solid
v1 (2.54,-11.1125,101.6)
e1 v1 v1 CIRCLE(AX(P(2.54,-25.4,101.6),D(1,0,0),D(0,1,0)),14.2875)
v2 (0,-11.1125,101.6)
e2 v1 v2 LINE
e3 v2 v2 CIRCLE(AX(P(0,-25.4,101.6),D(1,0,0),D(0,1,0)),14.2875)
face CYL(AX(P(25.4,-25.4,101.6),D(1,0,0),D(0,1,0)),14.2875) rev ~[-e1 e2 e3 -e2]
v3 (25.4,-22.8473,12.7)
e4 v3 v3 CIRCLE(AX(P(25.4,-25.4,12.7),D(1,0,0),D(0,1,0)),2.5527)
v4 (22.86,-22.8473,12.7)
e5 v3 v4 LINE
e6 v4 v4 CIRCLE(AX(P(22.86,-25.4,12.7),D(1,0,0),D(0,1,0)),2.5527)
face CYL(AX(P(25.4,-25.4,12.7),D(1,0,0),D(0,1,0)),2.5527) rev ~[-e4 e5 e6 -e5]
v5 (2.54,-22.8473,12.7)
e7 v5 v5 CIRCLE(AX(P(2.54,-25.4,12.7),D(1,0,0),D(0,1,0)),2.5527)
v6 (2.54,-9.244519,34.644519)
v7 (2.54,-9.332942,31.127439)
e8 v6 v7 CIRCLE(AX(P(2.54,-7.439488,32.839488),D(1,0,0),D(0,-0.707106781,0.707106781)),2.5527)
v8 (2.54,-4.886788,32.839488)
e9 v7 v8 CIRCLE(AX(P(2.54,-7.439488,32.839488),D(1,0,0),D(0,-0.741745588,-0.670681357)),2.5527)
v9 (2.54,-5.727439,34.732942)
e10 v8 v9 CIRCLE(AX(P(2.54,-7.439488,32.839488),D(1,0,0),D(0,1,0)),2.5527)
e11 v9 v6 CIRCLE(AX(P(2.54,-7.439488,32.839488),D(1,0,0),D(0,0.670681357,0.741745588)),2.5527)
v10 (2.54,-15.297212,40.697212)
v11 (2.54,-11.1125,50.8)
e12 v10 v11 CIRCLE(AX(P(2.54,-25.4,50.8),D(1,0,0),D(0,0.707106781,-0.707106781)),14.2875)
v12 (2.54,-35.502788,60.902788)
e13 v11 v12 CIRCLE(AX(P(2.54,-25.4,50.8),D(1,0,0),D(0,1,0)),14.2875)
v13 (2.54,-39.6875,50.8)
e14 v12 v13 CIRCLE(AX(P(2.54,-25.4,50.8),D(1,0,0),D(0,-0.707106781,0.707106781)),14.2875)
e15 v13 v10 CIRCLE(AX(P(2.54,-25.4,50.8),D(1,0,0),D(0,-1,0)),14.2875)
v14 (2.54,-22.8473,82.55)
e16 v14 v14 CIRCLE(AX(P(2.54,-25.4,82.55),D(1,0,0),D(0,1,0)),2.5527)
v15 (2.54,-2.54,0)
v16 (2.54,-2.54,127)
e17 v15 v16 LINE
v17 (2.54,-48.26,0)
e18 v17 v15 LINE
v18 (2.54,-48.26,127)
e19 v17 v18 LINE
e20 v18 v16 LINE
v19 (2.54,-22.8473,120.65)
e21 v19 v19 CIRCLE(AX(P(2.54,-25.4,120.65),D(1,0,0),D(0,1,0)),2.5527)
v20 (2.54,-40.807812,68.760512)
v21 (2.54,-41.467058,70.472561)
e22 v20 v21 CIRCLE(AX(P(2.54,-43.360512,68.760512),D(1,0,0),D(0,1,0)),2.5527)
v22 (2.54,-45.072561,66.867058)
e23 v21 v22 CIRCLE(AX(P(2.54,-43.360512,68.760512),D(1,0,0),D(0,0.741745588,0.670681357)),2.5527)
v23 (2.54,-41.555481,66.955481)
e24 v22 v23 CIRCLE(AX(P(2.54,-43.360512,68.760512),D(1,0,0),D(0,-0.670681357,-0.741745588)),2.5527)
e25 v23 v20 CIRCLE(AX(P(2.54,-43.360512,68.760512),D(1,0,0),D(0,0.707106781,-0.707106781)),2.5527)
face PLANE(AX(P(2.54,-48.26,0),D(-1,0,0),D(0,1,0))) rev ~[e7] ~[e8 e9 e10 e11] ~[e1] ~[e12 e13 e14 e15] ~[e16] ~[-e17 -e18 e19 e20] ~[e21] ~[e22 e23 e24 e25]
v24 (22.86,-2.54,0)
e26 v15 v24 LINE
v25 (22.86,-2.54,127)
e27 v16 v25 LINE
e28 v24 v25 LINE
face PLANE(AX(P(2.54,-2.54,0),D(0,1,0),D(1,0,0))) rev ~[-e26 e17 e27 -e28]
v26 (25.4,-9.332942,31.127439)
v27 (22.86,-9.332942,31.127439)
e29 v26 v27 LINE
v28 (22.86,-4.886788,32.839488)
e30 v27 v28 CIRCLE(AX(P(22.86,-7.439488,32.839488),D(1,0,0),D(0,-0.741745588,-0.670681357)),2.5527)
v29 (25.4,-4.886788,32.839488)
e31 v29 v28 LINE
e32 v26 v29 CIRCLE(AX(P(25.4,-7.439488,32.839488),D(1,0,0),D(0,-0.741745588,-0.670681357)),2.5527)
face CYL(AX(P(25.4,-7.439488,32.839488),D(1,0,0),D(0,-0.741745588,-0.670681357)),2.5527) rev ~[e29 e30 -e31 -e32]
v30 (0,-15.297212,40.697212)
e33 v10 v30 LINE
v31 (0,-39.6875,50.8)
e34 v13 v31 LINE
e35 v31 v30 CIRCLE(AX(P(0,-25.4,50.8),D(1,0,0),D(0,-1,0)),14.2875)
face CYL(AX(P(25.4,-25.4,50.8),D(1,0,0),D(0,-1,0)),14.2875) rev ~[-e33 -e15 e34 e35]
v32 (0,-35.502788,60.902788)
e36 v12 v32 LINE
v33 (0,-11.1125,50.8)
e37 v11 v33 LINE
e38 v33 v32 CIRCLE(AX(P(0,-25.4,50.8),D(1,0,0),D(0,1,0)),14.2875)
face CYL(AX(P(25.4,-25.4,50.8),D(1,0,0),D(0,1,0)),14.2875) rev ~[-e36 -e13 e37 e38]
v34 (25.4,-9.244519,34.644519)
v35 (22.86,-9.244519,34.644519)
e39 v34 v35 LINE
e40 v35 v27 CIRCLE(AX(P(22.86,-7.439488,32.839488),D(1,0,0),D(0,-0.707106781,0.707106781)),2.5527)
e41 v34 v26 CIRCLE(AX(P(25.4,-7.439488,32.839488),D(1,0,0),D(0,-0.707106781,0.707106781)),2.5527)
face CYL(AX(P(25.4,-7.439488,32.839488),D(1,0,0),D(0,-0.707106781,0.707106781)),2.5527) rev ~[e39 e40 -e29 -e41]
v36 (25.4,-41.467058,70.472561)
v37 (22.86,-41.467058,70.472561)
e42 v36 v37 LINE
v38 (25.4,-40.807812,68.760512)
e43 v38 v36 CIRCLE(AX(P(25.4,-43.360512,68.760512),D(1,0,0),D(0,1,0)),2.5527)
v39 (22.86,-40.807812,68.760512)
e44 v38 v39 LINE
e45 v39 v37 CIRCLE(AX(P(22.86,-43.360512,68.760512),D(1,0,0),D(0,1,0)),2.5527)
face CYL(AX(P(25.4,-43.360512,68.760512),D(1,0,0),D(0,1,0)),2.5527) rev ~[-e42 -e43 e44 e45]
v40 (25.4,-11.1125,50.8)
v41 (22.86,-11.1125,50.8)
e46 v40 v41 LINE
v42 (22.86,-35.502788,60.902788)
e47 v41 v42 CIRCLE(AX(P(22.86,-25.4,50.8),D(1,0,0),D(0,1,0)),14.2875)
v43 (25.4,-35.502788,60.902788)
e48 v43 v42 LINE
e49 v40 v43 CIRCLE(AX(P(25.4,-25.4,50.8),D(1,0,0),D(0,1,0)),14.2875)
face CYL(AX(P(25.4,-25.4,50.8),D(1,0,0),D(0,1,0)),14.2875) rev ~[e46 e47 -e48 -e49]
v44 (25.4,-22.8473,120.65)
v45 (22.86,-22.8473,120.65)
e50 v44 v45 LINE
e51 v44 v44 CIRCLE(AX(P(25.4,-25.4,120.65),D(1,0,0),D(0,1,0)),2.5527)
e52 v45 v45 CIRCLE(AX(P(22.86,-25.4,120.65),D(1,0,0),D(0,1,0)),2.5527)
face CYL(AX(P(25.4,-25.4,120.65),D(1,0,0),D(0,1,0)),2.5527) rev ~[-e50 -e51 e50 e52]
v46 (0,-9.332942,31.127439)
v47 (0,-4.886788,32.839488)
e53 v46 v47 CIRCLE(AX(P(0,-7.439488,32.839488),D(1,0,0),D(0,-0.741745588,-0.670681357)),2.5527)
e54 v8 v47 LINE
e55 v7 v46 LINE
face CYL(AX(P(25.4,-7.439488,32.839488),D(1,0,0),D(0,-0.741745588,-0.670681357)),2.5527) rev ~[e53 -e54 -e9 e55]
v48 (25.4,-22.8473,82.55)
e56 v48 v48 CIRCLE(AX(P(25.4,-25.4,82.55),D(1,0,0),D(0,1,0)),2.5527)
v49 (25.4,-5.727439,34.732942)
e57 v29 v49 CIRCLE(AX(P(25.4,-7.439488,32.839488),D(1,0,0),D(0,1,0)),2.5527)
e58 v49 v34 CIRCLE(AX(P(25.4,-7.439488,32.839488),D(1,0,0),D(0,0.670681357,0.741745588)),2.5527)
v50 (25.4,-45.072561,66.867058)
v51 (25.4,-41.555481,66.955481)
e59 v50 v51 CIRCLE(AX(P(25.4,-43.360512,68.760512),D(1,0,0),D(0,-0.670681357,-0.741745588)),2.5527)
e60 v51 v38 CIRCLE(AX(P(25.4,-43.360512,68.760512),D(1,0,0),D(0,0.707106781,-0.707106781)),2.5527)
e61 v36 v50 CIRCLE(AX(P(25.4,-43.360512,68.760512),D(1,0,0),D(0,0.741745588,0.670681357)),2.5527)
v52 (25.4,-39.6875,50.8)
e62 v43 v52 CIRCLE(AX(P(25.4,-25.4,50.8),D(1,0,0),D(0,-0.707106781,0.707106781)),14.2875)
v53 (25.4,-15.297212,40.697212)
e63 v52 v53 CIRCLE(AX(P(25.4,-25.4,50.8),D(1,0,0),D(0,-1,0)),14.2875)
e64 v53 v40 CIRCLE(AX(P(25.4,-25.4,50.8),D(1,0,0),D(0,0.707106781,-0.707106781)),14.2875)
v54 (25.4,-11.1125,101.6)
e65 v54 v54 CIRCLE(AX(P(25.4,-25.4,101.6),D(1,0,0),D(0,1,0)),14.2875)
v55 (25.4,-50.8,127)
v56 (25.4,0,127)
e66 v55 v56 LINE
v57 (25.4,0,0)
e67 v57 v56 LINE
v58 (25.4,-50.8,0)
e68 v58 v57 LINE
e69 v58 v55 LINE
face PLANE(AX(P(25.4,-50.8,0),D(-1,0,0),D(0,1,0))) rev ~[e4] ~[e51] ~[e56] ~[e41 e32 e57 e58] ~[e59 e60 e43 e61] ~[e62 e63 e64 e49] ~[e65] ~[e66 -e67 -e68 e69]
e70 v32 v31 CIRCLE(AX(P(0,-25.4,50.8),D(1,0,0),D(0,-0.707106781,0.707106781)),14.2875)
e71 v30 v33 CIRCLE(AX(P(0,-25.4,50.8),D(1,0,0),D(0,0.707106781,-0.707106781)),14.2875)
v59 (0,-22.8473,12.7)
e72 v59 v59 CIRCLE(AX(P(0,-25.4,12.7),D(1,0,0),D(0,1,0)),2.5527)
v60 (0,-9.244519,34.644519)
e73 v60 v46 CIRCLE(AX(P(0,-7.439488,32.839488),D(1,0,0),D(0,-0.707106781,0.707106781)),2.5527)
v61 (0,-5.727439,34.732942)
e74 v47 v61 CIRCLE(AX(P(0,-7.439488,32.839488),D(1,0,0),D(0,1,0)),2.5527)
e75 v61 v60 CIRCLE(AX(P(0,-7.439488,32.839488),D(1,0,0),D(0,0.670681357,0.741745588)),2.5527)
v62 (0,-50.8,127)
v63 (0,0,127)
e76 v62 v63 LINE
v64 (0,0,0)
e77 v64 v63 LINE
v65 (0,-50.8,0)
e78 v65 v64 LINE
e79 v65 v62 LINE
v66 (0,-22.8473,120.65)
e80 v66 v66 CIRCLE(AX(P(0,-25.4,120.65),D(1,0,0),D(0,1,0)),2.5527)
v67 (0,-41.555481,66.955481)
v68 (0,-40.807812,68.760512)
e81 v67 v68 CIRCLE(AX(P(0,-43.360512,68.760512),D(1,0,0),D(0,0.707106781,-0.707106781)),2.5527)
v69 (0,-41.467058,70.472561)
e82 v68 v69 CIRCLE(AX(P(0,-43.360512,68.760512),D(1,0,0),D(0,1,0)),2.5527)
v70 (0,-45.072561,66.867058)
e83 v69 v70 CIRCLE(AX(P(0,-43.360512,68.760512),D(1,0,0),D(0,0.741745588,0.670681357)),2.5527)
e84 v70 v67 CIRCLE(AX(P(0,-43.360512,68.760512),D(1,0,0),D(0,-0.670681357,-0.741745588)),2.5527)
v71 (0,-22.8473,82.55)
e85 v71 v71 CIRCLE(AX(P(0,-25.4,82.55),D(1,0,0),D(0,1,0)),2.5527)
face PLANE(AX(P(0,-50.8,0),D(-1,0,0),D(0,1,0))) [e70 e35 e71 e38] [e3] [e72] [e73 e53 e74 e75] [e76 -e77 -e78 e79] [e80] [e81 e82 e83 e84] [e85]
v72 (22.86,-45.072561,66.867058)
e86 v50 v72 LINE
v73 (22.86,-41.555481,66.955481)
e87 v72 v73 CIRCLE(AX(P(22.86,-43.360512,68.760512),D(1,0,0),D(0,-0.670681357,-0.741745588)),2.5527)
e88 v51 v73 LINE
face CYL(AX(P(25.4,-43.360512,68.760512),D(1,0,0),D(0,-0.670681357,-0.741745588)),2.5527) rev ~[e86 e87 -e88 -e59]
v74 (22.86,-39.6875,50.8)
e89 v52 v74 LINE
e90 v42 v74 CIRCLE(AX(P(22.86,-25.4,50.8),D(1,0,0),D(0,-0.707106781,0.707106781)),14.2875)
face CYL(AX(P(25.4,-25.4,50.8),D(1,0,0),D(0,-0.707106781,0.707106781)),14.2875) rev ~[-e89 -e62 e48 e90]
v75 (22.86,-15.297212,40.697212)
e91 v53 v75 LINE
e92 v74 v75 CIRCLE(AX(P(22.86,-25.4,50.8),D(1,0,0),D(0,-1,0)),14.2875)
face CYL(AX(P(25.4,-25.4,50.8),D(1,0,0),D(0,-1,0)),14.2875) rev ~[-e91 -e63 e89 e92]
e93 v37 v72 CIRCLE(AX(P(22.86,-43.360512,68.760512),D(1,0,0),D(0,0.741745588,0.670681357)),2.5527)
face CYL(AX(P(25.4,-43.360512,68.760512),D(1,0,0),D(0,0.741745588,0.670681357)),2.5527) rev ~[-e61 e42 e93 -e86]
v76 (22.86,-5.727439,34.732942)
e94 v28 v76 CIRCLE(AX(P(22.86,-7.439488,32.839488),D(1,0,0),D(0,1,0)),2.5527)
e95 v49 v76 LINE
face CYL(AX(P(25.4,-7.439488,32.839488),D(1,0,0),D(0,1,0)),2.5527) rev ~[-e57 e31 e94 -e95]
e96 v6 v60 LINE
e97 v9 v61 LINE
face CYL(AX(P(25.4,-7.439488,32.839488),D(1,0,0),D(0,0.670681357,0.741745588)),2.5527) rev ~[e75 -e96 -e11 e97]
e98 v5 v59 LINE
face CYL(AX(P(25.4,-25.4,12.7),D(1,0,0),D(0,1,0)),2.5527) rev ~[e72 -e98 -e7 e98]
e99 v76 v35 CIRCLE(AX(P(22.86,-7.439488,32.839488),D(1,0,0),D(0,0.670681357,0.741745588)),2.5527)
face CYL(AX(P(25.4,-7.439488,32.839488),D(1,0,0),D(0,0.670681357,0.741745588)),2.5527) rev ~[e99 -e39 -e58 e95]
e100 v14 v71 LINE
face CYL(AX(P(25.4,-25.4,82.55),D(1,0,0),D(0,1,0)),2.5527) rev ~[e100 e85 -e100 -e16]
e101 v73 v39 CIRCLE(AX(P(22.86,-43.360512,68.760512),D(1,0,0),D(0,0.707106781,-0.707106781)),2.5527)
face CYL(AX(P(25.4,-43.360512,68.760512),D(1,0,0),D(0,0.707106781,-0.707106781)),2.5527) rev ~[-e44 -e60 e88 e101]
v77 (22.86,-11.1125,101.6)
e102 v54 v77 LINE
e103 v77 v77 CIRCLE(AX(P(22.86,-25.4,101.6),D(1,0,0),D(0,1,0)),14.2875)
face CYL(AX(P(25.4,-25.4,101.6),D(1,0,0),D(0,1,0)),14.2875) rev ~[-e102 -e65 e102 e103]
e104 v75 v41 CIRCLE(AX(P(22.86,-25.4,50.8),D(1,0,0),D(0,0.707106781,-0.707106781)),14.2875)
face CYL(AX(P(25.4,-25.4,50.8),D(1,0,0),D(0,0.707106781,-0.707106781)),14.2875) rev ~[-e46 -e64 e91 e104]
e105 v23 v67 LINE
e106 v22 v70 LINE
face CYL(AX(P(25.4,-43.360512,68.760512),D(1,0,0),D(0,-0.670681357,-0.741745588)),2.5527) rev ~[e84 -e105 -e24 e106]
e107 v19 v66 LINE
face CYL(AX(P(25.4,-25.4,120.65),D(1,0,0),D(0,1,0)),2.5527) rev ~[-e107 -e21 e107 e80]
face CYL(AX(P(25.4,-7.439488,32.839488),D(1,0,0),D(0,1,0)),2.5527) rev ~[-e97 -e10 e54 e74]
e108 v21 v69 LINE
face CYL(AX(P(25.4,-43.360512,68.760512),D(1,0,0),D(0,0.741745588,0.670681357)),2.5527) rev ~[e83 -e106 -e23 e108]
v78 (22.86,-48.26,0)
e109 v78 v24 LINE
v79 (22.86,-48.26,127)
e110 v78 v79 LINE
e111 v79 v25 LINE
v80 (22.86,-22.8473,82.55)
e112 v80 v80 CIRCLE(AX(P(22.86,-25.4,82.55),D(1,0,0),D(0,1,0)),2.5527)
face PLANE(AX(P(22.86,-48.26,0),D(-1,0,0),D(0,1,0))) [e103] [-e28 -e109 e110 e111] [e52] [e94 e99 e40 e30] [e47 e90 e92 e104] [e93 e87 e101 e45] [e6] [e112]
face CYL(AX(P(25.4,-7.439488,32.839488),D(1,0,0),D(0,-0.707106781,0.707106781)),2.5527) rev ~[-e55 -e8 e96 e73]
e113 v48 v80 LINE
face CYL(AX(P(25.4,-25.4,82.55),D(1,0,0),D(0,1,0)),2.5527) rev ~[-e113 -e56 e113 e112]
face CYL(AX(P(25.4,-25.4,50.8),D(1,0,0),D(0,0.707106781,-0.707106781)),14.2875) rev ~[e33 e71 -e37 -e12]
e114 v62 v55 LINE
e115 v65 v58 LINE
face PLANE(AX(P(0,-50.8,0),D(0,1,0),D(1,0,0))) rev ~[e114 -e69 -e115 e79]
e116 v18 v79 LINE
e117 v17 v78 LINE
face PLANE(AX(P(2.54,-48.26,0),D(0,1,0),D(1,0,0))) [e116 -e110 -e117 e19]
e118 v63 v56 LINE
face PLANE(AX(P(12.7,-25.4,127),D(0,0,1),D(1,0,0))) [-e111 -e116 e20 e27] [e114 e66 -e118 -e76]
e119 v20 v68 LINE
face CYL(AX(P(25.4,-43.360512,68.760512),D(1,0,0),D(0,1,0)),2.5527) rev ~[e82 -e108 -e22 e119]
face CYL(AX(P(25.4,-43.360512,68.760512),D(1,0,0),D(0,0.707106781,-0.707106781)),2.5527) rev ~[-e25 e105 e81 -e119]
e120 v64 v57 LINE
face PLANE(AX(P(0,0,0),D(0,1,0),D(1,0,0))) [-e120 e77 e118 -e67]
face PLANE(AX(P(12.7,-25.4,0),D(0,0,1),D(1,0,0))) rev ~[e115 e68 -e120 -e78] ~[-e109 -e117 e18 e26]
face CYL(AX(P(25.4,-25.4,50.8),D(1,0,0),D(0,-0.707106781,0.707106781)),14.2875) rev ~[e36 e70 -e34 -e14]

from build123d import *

# Parameters (mm, degrees)
F0_W     = 25.4
F0_H     = 50.8
F0_W_2   = 20.32
F0_H_2   = 45.72
F1_DEPTH = 127
F2_R     = 2.5527
F2_R_2   = 14.2875
F3_DEPTH = 50.8


# Not quite as in the source:
# - a feature names something its author has since deleted; it is built from what else it names


with BuildPart() as f1:
    # F0 (on Top) → F1 (new body)
    with BuildSketch(Plane.XY):
        with Locations((12.7, -25.4)):
            Rectangle(F0_W, F0_H)
        with Locations((12.7, -25.4)):
            Rectangle(F0_W_2, F0_H_2, mode=Mode.SUBTRACT)
    extrude(amount=F1_DEPTH)

    # F2 (on face) → F3 (cut)
    with BuildSketch(Plane.YZ.offset(25.4)):
        with BuildLine():
            ThreePointArc((-43.3605122421, 68.7605122421), (-42.4353064615, 69.6403379418), (-41.467058279, 70.4725605415))
            ThreePointArc((-41.467058279, 70.4725605415), (-45.1655437225, 70.5655437225), (-45.0725605415, 66.867058279))
            ThreePointArc((-45.0725605415, 66.867058279), (-44.2403379418, 67.8353064615), (-43.3605122421, 68.7605122421))
        make_face()
        with Locations((-25.4, 82.55)):
            Circle(F2_R)
        with Locations((-25.4, 12.7)):
            Circle(F2_R)
        with BuildLine():
            Line((-25.4, 50.8), (-15.2972118638, 40.6972118638))
            ThreePointArc((-15.2972118638, 40.6972118638), (-12.2000711792, 45.3324104601), (-11.1125, 50.8))
            ThreePointArc((-11.1125, 50.8), (-19.9324104601, 63.9999288208), (-35.5027881362, 60.9027881362))
            Line((-35.5027881362, 60.9027881362), (-25.4, 50.8))
        make_face()
        with BuildLine():
            Line((-25.4, 50.8), (-35.5027881362, 60.9027881362))
            ThreePointArc((-35.5027881362, 60.9027881362), (-38.5999288208, 56.2675895399), (-39.6875, 50.8))
            Line((-39.6875, 50.8), (-25.4, 50.8))
        make_face()
        with BuildLine():
            Line((-41.5554807618, 66.9554807618), (-43.3605122421, 68.7605122421))
            ThreePointArc((-43.3605122421, 68.7605122421), (-44.2403379418, 67.8353064615), (-45.0725605415, 66.867058279))
            ThreePointArc((-45.0725605415, 66.867058279), (-43.2963553886, 66.2086185946), (-41.5554807618, 66.9554807618))
        make_face()
        with BuildLine():
            ThreePointArc((-40.8078122421, 68.7605122421), (-40.9783181672, 69.6778064584), (-41.467058279, 70.4725605415))
            ThreePointArc((-41.467058279, 70.4725605415), (-42.4353064615, 69.6403379418), (-43.3605122421, 68.7605122421))
            Line((-43.3605122421, 68.7605122421), (-41.5554807618, 66.9554807618))
            ThreePointArc((-41.5554807618, 66.9554807618), (-41.0021249595, 67.7836362443), (-40.8078122421, 68.7605122421))
        make_face()
        with BuildLine():
            ThreePointArc((-39.6875, 50.8), (-30.8675895399, 37.6000711792), (-15.2972118638, 40.6972118638))
            Line((-15.2972118638, 40.6972118638), (-25.4, 50.8))
            Line((-25.4, 50.8), (-39.6875, 50.8))
        make_face()
        with BuildLine():
            ThreePointArc((-4.8867877579, 32.8394877579), (-5.1063972127, 33.8753283817), (-5.7274394585, 34.732941721))
            ThreePointArc((-5.7274394585, 34.732941721), (-6.5596620582, 33.7646935385), (-7.4394877579, 32.8394877579))
            ThreePointArc((-7.4394877579, 32.8394877579), (-8.3646935385, 31.9596620582), (-9.332941721, 31.1274394585))
            ThreePointArc((-9.332941721, 31.1274394585), (-6.5221935416, 30.4572936829), (-4.8867877579, 32.8394877579))
        make_face()
        with BuildLine():
            ThreePointArc((-7.4394877579, 32.8394877579), (-6.5596620582, 33.7646935385), (-5.7274394585, 34.732941721))
            ThreePointArc((-5.7274394585, 34.732941721), (-7.5036446114, 35.3913814054), (-9.2445192382, 34.6445192382))
            Line((-9.2445192382, 34.6445192382), (-7.4394877579, 32.8394877579))
        make_face()
        with BuildLine():
            ThreePointArc((-9.332941721, 31.1274394585), (-8.3646935385, 31.9596620582), (-7.4394877579, 32.8394877579))
            Line((-7.4394877579, 32.8394877579), (-9.2445192382, 34.6445192382))
            ThreePointArc((-9.2445192382, 34.6445192382), (-9.9913814054, 32.9036446114), (-9.332941721, 31.1274394585))
        make_face()
        with Locations((-25.4, 120.65)):
            Circle(F2_R)
        with Locations((-25.4, 101.6)):
            Circle(F2_R_2)
    extrude(amount=-F3_DEPTH, mode=Mode.SUBTRACT)


solid = f1.part
